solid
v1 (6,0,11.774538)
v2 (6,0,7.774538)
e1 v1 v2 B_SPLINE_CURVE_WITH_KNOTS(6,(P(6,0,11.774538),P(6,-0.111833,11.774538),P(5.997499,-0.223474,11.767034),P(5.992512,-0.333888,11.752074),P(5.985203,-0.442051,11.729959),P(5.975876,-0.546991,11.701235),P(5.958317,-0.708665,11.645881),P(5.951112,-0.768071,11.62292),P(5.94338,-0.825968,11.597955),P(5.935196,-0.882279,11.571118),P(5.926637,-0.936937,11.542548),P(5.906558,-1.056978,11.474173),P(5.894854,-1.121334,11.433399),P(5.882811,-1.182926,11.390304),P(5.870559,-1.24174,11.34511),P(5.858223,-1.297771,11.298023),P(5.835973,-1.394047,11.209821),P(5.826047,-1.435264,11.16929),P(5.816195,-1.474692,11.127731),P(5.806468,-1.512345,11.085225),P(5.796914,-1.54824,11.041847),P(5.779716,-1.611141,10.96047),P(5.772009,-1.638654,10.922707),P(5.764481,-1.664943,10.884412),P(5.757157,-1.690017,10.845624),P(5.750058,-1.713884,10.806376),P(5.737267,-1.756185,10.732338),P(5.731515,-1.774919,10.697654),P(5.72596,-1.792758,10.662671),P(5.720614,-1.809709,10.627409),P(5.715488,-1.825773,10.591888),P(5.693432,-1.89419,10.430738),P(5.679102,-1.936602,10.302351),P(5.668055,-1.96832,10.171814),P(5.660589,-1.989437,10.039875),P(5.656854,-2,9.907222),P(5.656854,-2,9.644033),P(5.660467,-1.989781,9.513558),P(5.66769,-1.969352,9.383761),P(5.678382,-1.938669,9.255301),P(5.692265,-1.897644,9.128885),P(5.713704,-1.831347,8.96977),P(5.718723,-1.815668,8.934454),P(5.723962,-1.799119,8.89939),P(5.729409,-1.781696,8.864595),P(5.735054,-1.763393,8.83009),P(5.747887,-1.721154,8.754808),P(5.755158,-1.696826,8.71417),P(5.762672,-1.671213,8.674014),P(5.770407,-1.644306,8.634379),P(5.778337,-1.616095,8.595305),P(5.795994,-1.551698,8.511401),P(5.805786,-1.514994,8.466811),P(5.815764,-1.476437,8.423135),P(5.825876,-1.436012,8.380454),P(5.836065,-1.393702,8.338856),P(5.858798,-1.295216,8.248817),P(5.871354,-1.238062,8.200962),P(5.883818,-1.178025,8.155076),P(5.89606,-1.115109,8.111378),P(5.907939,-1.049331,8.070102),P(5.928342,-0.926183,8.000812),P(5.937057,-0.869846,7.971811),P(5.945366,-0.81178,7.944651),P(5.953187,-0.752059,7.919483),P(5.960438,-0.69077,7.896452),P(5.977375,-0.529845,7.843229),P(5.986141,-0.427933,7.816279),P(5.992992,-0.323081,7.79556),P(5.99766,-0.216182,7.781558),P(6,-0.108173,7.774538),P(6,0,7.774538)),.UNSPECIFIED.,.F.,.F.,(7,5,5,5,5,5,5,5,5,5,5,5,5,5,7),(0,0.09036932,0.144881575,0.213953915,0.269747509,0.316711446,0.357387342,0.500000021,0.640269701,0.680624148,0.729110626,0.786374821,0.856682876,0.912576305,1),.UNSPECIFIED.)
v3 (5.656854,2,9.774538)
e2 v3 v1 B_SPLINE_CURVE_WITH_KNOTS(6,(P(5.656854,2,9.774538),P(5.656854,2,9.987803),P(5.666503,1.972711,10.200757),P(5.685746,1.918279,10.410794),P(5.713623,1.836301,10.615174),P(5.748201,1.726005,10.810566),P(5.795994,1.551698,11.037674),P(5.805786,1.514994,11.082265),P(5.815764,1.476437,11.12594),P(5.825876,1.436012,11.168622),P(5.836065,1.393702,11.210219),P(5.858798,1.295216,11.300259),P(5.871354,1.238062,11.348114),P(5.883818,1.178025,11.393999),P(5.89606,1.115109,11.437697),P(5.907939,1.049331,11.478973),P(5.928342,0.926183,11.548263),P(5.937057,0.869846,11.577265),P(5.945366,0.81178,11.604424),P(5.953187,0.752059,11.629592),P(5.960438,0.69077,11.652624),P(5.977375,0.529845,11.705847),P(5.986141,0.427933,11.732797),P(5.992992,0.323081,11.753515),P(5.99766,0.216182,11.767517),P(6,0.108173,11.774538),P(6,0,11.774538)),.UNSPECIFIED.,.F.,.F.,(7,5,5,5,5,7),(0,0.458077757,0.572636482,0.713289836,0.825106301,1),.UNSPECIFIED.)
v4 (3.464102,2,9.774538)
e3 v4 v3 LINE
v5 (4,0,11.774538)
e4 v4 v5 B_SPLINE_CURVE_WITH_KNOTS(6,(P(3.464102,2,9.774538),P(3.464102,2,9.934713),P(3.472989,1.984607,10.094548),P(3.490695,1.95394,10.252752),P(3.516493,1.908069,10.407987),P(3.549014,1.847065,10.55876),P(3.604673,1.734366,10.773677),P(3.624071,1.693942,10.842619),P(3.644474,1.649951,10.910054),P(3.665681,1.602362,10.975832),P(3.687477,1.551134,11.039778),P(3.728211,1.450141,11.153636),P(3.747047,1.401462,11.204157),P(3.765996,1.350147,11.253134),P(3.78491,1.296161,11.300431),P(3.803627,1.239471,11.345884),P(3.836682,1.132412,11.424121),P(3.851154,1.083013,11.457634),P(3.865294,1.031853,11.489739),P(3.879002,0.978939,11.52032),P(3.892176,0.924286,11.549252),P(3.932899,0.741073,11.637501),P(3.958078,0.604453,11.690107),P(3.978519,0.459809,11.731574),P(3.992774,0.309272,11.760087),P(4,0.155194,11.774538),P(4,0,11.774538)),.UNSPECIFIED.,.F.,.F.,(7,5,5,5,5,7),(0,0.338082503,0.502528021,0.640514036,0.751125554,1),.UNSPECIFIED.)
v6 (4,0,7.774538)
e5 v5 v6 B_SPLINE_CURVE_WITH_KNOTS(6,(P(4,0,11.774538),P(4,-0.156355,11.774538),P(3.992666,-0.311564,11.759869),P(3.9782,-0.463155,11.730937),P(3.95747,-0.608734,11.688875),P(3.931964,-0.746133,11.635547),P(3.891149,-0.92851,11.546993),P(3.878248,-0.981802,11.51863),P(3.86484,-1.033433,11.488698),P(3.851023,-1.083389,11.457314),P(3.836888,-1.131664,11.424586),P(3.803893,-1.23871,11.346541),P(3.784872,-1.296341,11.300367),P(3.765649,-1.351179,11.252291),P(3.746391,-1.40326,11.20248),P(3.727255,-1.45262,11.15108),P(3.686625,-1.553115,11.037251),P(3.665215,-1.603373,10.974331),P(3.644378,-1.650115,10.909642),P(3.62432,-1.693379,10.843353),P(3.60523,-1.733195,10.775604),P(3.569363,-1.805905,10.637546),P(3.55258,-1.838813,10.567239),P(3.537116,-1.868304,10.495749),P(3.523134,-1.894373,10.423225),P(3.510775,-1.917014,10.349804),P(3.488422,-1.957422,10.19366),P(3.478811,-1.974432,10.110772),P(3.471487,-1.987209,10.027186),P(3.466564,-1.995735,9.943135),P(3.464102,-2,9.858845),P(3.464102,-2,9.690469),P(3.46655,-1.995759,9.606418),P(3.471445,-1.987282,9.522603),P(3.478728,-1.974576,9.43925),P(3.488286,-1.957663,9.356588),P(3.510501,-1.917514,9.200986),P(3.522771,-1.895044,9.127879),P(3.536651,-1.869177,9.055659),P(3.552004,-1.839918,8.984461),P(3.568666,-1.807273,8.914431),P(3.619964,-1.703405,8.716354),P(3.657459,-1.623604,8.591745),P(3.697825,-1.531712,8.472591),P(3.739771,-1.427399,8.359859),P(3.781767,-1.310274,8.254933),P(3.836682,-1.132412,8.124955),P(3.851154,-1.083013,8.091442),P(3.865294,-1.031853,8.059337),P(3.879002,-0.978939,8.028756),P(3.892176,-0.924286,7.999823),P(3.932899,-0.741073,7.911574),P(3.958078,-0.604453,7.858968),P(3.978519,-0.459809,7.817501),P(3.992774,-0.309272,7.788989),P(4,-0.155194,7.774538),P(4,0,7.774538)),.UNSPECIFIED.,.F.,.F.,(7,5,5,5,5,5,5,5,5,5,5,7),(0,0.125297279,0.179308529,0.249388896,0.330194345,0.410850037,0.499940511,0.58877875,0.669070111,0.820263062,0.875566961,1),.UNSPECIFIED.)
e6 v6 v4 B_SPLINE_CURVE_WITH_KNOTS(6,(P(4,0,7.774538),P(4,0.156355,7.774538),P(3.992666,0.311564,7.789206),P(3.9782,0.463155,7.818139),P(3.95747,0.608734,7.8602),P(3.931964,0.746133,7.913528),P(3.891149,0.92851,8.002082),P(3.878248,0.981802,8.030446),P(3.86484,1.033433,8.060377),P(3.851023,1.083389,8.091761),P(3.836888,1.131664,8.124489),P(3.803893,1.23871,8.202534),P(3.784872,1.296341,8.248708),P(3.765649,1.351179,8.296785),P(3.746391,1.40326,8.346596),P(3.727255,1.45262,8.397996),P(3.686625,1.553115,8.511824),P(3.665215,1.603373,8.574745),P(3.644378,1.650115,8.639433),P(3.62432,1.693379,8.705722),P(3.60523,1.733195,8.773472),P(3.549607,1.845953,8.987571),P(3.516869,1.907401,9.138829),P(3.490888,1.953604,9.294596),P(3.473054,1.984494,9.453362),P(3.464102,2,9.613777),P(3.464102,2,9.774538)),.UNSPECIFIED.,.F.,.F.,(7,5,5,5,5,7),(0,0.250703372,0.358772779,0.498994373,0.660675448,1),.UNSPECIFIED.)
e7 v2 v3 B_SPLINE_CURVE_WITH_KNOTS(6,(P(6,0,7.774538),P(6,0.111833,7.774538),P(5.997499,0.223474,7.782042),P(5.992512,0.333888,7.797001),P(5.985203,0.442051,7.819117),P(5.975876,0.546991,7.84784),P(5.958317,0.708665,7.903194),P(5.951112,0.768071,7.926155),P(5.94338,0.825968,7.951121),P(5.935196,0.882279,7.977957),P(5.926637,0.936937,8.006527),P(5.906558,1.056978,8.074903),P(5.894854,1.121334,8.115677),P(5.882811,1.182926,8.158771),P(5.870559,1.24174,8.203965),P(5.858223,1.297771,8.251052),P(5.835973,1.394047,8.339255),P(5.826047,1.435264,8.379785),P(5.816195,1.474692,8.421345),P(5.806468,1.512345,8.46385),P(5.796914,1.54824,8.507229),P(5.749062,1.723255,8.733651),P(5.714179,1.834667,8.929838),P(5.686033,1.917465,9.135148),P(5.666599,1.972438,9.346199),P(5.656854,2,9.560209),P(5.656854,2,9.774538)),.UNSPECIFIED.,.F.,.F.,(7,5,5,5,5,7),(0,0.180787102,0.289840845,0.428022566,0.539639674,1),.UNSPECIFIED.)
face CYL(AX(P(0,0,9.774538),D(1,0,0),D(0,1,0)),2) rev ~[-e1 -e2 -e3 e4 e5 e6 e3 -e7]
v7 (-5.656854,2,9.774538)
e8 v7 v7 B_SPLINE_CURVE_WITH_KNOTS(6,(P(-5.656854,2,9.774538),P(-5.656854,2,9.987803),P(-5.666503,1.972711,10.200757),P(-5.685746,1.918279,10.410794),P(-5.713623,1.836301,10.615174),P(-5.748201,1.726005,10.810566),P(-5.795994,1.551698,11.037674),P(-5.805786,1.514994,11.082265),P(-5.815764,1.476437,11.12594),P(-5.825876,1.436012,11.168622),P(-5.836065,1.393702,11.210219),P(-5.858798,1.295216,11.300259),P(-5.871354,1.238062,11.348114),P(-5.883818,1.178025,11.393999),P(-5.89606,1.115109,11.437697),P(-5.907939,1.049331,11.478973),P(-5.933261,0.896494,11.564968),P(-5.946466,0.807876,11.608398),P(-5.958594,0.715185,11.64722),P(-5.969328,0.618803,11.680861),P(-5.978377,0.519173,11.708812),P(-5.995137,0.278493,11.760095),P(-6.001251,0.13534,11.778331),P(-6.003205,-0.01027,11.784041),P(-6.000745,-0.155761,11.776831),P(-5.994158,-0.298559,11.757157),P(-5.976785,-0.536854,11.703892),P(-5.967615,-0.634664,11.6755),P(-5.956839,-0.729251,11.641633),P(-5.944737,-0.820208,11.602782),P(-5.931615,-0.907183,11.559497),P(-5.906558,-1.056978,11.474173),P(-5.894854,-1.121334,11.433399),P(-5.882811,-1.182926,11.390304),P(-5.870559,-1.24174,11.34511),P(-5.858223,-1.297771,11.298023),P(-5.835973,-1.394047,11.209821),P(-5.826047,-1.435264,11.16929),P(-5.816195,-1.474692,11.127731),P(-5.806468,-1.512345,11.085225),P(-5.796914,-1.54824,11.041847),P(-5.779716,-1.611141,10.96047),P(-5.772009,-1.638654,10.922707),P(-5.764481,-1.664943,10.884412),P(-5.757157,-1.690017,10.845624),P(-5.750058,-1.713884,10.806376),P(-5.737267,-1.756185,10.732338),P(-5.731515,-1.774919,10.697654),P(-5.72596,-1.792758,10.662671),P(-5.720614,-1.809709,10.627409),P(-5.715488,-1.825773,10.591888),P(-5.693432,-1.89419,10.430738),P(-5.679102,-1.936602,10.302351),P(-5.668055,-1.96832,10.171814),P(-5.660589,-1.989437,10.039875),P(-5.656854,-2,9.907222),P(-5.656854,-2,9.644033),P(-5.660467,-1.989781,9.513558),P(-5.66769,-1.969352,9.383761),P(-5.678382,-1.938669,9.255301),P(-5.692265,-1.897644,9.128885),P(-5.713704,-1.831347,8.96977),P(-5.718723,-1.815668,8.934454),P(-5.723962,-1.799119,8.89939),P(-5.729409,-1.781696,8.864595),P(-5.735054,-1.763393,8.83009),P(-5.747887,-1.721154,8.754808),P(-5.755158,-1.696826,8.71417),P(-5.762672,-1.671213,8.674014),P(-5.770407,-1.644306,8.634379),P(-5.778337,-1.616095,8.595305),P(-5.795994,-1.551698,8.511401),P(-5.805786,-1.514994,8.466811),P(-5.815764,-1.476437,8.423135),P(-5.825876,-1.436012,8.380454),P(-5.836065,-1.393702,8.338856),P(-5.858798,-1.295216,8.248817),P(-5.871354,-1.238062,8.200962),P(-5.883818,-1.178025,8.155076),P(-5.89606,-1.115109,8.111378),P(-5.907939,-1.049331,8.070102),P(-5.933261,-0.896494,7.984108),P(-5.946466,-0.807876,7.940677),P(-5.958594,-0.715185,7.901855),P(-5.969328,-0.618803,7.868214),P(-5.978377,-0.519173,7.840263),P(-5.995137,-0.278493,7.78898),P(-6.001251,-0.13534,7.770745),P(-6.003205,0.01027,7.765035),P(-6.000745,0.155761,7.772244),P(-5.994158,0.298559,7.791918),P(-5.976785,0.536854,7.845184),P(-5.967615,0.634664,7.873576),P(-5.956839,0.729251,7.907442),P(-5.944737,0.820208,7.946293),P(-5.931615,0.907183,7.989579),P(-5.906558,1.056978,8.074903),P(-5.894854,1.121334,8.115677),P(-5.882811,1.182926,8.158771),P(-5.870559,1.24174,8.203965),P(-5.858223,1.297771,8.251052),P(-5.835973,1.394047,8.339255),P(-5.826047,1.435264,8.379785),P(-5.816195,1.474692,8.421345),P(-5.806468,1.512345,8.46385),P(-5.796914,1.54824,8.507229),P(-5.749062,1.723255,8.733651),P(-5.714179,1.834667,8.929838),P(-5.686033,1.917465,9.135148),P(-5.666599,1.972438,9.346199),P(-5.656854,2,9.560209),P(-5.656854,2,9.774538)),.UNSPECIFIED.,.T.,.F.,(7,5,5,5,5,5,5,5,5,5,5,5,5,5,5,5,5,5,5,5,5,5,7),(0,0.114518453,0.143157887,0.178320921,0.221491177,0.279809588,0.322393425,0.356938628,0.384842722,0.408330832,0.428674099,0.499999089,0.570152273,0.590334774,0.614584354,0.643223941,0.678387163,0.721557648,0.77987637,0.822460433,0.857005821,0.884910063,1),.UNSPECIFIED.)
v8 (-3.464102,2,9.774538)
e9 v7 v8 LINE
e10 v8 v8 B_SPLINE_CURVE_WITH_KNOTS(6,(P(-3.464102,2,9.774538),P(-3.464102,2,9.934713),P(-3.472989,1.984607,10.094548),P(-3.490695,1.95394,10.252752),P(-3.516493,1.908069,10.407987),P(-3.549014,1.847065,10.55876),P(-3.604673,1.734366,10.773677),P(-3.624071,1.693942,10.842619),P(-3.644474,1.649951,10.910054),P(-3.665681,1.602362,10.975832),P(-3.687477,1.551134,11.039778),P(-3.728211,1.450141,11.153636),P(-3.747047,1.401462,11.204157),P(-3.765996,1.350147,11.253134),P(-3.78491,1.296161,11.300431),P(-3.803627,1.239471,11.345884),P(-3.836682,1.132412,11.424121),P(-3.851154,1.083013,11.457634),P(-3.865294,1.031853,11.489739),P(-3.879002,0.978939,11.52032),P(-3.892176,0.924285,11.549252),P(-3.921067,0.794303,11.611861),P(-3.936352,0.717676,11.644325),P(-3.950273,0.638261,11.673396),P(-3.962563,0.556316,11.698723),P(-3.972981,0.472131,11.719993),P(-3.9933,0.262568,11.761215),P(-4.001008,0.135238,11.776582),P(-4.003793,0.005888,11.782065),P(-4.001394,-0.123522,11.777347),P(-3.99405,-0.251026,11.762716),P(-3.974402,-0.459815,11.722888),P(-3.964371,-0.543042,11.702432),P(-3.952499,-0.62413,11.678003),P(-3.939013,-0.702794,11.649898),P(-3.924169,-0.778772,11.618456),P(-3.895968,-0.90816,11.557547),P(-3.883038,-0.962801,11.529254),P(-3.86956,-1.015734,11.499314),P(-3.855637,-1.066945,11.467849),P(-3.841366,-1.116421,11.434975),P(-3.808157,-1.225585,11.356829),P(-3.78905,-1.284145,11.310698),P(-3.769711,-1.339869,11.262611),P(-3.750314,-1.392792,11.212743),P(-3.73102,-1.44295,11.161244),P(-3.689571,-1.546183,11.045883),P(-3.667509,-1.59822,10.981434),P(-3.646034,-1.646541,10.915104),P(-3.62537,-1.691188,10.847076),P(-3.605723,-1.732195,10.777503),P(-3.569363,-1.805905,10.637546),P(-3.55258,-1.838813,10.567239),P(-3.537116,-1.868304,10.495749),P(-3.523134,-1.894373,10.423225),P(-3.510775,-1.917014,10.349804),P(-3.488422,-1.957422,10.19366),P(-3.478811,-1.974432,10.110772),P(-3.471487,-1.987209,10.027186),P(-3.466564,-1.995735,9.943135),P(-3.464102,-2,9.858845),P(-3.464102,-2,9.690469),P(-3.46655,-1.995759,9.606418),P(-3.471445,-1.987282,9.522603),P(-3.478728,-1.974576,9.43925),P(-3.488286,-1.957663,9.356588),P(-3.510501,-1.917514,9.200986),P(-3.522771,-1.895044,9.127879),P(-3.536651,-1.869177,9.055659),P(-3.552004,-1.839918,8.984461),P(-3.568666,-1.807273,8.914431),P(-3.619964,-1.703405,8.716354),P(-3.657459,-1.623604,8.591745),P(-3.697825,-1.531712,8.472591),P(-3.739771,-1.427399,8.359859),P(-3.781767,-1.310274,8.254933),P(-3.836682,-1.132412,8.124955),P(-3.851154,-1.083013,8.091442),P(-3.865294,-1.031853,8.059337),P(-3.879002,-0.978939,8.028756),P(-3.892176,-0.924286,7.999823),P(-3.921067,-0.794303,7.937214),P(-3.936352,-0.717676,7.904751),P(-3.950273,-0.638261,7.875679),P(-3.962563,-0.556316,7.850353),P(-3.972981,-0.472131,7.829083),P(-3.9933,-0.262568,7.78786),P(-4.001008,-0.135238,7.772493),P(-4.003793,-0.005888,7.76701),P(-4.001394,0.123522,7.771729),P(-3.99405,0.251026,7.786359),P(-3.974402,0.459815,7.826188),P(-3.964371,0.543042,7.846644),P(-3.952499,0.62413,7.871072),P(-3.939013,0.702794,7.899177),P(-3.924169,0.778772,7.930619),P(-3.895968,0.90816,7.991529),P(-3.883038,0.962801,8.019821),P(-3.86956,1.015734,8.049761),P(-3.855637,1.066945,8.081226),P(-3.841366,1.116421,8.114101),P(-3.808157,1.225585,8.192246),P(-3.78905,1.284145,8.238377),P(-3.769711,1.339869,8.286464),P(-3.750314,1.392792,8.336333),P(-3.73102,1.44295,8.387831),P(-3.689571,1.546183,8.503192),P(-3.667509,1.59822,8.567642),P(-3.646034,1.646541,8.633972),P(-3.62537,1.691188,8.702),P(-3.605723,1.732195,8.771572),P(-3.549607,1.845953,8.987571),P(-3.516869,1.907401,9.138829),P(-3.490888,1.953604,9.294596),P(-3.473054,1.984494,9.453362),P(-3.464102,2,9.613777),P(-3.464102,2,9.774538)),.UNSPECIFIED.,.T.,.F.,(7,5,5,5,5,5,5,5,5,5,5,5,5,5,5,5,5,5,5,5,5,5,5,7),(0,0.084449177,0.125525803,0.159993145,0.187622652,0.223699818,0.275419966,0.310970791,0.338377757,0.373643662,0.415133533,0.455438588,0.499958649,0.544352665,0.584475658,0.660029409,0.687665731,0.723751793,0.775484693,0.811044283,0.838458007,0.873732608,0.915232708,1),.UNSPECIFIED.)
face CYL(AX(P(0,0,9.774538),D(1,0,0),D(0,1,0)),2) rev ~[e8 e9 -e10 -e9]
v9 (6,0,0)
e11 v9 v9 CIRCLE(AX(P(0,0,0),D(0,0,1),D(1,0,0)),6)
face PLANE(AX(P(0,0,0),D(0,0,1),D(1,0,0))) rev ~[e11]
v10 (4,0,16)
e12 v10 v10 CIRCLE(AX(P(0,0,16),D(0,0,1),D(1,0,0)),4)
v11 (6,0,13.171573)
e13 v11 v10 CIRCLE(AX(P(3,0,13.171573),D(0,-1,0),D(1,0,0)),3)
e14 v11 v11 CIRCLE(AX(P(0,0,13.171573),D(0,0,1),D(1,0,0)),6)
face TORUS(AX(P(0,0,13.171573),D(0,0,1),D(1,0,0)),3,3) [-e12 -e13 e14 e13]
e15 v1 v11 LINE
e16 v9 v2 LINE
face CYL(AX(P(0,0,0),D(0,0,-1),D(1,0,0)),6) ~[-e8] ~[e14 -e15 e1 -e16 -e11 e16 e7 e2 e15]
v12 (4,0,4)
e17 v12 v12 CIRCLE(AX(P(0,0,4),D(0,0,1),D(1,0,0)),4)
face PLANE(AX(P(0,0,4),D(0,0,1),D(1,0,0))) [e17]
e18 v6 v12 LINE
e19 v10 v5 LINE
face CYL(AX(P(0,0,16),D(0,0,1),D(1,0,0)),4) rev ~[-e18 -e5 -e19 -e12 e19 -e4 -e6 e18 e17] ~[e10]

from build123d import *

# Parameters (mm, degrees)
F0_R     = 6
F1_DEPTH = 16
F2_R     = 2
F3_DEPTH = 12.5
F4_R     = 4
F5_DEPTH = 12


# Not quite as in the source:
# - a fillet or chamfer that OpenCascade refuses, or shapes differently, is made with other operations: its cross-section is extruded or revolved along the edge and cut away or added


with BuildPart() as f1:
    # F0 (on Top) → F1 (new body)
    with BuildSketch(Plane.XY):
        Circle(F0_R)
    extrude(amount=F1_DEPTH)

    # F2 (on Right) → F3 (cut, symmetric)
    with BuildSketch(Plane.YZ):
        with Locations((0, 9.7745376602)):
            Circle(F2_R)
    extrude(amount=F3_DEPTH, both=True, mode=Mode.SUBTRACT)

    # F4 (on face) → F5 (cut)
    with BuildSketch(Plane.XY.offset(16)):
        Circle(F4_R)
    extrude(amount=-F5_DEPTH, mode=Mode.SUBTRACT)

    # F6: fillet of radius 3 on 1 edges, made by hand

    # F6_s1 → F6_t2 (revolve, cut)
    with BuildSketch(Plane.XZ):
        with BuildLine():
            ThreePointArc((6, 13.1715728753), (5.4494897428, 14.9036236828), (4, 16))
            Line((4, 16), (6, 16))
            Line((6, 16), (6, 13.1715728753))
        make_face()
    revolve(axis=Axis((0, 0, 16), (0, 0, 1)), mode=Mode.SUBTRACT)


solid = f1.part
